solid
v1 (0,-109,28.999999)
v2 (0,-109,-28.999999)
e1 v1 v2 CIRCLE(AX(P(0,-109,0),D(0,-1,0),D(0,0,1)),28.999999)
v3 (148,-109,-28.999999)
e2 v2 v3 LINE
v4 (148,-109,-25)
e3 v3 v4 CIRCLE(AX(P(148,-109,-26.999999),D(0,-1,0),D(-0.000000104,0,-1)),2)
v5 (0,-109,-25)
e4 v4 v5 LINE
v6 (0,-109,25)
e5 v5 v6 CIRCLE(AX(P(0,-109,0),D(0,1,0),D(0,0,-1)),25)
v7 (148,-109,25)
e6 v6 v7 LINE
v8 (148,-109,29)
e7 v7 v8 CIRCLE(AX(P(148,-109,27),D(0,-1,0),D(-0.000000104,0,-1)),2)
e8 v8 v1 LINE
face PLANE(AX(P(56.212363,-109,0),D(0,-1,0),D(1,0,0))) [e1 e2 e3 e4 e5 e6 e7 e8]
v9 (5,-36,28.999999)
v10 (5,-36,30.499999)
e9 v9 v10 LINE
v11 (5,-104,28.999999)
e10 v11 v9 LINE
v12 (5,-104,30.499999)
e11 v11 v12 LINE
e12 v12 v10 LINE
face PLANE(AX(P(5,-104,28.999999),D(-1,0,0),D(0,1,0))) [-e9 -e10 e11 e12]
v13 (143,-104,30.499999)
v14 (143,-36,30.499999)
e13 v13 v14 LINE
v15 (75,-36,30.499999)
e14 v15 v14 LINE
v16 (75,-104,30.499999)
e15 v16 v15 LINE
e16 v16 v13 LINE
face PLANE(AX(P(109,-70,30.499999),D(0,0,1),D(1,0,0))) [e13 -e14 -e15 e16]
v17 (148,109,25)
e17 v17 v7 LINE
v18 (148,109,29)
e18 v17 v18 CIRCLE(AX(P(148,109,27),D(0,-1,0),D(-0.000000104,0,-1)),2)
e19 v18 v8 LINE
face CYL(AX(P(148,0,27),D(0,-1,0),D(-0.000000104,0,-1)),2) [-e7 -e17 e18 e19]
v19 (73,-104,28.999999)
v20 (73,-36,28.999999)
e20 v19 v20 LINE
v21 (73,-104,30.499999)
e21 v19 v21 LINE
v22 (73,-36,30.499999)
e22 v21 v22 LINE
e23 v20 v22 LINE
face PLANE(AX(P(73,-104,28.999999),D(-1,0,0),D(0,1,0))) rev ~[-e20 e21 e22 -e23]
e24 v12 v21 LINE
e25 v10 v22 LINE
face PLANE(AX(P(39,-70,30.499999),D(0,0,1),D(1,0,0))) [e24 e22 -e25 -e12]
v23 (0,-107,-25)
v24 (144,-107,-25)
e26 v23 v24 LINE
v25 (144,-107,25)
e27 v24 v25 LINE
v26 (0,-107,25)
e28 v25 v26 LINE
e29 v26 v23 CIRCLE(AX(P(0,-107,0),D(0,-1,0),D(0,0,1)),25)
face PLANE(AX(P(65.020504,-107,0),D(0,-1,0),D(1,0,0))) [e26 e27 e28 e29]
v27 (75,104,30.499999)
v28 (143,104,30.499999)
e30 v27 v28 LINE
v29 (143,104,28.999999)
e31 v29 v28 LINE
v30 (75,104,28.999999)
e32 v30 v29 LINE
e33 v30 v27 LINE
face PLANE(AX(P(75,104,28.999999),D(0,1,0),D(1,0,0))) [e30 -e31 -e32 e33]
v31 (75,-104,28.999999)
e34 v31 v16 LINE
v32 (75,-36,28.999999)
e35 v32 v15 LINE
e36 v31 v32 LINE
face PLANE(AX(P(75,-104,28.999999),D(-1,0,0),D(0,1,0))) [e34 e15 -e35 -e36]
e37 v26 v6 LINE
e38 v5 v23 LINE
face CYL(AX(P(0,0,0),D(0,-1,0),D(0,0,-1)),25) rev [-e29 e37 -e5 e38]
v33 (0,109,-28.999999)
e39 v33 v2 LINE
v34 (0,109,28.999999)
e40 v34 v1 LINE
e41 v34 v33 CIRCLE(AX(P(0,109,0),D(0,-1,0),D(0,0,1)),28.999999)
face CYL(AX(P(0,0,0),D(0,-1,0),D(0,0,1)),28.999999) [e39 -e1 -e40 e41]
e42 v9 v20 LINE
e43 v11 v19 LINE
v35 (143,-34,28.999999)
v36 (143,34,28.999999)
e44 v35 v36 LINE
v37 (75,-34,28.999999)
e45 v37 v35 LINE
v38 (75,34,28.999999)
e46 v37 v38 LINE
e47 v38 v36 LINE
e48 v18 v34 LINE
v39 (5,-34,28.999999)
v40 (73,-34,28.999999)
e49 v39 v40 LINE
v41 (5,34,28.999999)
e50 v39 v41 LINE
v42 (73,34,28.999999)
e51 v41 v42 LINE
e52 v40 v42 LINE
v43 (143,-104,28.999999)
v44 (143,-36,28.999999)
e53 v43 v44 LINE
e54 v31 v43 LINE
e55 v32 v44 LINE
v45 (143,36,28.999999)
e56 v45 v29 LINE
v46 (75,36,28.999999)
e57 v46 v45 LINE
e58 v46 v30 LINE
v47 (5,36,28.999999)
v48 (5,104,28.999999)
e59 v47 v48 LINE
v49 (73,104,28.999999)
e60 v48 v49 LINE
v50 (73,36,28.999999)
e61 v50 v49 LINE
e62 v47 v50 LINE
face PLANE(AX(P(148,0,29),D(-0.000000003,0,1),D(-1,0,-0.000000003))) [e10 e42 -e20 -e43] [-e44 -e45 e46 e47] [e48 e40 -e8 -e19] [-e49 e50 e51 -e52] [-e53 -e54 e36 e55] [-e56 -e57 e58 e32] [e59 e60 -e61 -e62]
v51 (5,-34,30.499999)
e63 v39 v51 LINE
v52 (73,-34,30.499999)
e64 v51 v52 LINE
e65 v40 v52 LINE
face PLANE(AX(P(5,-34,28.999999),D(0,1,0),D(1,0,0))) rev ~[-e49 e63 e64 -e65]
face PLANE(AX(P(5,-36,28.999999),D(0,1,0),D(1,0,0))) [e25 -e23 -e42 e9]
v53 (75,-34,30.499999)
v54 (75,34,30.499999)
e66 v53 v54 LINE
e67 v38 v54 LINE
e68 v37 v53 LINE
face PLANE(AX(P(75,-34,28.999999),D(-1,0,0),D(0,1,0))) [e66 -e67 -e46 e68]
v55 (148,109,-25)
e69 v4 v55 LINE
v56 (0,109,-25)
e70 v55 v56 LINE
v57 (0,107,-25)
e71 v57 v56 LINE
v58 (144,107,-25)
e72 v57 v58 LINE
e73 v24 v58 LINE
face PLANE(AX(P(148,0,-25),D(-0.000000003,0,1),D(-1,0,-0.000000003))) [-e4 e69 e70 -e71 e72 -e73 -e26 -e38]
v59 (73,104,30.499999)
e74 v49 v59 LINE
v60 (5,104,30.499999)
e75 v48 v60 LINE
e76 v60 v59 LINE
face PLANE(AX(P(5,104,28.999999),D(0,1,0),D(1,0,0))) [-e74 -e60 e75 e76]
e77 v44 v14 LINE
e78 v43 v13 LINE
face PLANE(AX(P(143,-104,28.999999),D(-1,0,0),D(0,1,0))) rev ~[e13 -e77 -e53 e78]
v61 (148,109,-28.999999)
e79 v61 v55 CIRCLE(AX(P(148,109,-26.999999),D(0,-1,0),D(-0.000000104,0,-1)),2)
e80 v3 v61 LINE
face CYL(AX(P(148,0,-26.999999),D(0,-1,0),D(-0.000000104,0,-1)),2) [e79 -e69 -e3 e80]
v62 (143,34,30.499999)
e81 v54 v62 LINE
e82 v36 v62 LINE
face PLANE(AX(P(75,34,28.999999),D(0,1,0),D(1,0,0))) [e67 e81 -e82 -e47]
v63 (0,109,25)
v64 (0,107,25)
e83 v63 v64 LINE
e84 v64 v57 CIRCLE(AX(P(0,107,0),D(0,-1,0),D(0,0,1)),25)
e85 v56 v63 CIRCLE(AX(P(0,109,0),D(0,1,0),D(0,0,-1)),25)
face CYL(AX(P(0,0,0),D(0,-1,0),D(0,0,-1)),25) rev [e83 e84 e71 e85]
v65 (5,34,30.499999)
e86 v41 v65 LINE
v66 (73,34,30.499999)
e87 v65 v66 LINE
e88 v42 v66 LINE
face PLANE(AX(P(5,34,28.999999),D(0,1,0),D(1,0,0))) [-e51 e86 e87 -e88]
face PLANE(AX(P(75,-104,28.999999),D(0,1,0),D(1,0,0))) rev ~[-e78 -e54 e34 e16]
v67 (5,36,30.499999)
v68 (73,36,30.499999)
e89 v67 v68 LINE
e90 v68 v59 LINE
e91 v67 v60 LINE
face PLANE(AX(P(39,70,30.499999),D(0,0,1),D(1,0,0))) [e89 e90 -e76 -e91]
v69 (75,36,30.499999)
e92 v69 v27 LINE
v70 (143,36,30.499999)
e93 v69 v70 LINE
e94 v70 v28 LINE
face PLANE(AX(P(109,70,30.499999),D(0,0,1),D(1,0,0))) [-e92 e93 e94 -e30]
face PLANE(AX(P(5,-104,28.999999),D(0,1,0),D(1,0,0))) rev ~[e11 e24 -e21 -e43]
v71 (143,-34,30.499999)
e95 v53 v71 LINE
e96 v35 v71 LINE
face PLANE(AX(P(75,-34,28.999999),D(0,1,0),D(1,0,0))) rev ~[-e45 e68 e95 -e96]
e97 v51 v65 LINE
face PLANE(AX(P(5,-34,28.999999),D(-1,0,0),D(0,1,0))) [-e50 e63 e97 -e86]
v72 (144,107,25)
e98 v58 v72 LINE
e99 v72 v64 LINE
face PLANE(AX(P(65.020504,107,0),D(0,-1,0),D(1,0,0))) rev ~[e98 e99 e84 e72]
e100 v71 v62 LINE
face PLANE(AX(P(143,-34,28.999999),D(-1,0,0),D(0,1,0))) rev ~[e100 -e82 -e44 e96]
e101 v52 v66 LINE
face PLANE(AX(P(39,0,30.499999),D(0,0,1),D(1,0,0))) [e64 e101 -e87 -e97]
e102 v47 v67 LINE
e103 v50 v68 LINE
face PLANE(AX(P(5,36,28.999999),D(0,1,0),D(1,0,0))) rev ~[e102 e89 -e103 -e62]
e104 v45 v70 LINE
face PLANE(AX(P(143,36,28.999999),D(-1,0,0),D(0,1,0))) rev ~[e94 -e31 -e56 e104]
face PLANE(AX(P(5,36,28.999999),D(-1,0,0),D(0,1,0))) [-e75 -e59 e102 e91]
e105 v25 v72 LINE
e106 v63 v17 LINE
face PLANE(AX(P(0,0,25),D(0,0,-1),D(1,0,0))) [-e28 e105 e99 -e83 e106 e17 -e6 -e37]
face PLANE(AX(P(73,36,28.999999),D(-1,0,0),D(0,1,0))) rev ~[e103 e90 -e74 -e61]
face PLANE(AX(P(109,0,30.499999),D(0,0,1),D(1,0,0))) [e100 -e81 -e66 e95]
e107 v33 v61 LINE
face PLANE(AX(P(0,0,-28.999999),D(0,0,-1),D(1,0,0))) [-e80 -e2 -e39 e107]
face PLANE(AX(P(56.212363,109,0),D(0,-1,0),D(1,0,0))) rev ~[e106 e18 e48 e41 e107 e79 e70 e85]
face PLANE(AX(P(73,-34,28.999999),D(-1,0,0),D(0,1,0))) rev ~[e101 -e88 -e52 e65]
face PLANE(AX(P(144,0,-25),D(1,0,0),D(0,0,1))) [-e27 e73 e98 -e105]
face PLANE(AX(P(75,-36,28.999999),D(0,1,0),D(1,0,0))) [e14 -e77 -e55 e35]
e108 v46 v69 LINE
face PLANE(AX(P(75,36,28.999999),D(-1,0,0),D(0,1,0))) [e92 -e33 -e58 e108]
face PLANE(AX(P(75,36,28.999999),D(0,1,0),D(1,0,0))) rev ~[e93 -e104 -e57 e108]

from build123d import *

# Parameters (mm, degrees)
F1_DEPTH = 109
F3_DEPTH = 107
F4_W     = 68
F4_H     = 68
F5_DEPTH = 1.5


# Not quite as in the source:
# - ends of sketch curves that miss each other by under 0.0002 mm in the source are joined


with BuildPart() as f1:
    # F0 (on Front) → F1 (new body, symmetric)
    with BuildSketch(Plane.XZ):
        with BuildLine():
            ThreePointArc((0, -25), (-25, 0), (0, 25))
            Line((0, 25), (148, 25))
            ThreePointArc((148, 25), (150, 26.9999995828), (148, 28.9999995828))
            Line((148, 28.9999995828), (0, 28.9999991655))
            ThreePointArc((0, 28.9999991655), (-28.9999991655, 0), (0, -28.9999991655))
            Line((0, -28.9999991655), (148, -28.9999991655))
            ThreePointArc((148, -28.9999991655), (150, -26.9999995828), (148, -24.9999995828))
            Line((148, -24.9999995828), (0, -25))
        make_face()
    extrude(amount=F1_DEPTH, both=True)

    # F2 (on Front) → F3 (join, symmetric)
    with BuildSketch(Plane.XZ):
        with BuildLine():
            Line((144, 25), (0, 25))
            ThreePointArc((0, 25), (-25, 0), (0, -25))
            Line((0, -25), (144, -25))
            Line((144, -25), (144, 25))
        make_face()
    extrude(amount=F3_DEPTH, both=True)

    # F4 (on face) → F5 (join)
    with BuildSketch(Plane.XY.offset(28.9999991655)):
        with Locations((39, 70)):
            Rectangle(F4_W, F4_H)
        with Locations((39, 0)):
            Rectangle(F4_W, F4_H)
        with Locations((39, -70)):
            Rectangle(F4_W, F4_H)
        with Locations((109, 70)):
            Rectangle(F4_W, F4_H)
        with Locations((109, 0)):
            Rectangle(F4_W, F4_H)
        with Locations((109, -70)):
            Rectangle(F4_W, F4_H)
    extrude(amount=F5_DEPTH)


solid = f1.part
